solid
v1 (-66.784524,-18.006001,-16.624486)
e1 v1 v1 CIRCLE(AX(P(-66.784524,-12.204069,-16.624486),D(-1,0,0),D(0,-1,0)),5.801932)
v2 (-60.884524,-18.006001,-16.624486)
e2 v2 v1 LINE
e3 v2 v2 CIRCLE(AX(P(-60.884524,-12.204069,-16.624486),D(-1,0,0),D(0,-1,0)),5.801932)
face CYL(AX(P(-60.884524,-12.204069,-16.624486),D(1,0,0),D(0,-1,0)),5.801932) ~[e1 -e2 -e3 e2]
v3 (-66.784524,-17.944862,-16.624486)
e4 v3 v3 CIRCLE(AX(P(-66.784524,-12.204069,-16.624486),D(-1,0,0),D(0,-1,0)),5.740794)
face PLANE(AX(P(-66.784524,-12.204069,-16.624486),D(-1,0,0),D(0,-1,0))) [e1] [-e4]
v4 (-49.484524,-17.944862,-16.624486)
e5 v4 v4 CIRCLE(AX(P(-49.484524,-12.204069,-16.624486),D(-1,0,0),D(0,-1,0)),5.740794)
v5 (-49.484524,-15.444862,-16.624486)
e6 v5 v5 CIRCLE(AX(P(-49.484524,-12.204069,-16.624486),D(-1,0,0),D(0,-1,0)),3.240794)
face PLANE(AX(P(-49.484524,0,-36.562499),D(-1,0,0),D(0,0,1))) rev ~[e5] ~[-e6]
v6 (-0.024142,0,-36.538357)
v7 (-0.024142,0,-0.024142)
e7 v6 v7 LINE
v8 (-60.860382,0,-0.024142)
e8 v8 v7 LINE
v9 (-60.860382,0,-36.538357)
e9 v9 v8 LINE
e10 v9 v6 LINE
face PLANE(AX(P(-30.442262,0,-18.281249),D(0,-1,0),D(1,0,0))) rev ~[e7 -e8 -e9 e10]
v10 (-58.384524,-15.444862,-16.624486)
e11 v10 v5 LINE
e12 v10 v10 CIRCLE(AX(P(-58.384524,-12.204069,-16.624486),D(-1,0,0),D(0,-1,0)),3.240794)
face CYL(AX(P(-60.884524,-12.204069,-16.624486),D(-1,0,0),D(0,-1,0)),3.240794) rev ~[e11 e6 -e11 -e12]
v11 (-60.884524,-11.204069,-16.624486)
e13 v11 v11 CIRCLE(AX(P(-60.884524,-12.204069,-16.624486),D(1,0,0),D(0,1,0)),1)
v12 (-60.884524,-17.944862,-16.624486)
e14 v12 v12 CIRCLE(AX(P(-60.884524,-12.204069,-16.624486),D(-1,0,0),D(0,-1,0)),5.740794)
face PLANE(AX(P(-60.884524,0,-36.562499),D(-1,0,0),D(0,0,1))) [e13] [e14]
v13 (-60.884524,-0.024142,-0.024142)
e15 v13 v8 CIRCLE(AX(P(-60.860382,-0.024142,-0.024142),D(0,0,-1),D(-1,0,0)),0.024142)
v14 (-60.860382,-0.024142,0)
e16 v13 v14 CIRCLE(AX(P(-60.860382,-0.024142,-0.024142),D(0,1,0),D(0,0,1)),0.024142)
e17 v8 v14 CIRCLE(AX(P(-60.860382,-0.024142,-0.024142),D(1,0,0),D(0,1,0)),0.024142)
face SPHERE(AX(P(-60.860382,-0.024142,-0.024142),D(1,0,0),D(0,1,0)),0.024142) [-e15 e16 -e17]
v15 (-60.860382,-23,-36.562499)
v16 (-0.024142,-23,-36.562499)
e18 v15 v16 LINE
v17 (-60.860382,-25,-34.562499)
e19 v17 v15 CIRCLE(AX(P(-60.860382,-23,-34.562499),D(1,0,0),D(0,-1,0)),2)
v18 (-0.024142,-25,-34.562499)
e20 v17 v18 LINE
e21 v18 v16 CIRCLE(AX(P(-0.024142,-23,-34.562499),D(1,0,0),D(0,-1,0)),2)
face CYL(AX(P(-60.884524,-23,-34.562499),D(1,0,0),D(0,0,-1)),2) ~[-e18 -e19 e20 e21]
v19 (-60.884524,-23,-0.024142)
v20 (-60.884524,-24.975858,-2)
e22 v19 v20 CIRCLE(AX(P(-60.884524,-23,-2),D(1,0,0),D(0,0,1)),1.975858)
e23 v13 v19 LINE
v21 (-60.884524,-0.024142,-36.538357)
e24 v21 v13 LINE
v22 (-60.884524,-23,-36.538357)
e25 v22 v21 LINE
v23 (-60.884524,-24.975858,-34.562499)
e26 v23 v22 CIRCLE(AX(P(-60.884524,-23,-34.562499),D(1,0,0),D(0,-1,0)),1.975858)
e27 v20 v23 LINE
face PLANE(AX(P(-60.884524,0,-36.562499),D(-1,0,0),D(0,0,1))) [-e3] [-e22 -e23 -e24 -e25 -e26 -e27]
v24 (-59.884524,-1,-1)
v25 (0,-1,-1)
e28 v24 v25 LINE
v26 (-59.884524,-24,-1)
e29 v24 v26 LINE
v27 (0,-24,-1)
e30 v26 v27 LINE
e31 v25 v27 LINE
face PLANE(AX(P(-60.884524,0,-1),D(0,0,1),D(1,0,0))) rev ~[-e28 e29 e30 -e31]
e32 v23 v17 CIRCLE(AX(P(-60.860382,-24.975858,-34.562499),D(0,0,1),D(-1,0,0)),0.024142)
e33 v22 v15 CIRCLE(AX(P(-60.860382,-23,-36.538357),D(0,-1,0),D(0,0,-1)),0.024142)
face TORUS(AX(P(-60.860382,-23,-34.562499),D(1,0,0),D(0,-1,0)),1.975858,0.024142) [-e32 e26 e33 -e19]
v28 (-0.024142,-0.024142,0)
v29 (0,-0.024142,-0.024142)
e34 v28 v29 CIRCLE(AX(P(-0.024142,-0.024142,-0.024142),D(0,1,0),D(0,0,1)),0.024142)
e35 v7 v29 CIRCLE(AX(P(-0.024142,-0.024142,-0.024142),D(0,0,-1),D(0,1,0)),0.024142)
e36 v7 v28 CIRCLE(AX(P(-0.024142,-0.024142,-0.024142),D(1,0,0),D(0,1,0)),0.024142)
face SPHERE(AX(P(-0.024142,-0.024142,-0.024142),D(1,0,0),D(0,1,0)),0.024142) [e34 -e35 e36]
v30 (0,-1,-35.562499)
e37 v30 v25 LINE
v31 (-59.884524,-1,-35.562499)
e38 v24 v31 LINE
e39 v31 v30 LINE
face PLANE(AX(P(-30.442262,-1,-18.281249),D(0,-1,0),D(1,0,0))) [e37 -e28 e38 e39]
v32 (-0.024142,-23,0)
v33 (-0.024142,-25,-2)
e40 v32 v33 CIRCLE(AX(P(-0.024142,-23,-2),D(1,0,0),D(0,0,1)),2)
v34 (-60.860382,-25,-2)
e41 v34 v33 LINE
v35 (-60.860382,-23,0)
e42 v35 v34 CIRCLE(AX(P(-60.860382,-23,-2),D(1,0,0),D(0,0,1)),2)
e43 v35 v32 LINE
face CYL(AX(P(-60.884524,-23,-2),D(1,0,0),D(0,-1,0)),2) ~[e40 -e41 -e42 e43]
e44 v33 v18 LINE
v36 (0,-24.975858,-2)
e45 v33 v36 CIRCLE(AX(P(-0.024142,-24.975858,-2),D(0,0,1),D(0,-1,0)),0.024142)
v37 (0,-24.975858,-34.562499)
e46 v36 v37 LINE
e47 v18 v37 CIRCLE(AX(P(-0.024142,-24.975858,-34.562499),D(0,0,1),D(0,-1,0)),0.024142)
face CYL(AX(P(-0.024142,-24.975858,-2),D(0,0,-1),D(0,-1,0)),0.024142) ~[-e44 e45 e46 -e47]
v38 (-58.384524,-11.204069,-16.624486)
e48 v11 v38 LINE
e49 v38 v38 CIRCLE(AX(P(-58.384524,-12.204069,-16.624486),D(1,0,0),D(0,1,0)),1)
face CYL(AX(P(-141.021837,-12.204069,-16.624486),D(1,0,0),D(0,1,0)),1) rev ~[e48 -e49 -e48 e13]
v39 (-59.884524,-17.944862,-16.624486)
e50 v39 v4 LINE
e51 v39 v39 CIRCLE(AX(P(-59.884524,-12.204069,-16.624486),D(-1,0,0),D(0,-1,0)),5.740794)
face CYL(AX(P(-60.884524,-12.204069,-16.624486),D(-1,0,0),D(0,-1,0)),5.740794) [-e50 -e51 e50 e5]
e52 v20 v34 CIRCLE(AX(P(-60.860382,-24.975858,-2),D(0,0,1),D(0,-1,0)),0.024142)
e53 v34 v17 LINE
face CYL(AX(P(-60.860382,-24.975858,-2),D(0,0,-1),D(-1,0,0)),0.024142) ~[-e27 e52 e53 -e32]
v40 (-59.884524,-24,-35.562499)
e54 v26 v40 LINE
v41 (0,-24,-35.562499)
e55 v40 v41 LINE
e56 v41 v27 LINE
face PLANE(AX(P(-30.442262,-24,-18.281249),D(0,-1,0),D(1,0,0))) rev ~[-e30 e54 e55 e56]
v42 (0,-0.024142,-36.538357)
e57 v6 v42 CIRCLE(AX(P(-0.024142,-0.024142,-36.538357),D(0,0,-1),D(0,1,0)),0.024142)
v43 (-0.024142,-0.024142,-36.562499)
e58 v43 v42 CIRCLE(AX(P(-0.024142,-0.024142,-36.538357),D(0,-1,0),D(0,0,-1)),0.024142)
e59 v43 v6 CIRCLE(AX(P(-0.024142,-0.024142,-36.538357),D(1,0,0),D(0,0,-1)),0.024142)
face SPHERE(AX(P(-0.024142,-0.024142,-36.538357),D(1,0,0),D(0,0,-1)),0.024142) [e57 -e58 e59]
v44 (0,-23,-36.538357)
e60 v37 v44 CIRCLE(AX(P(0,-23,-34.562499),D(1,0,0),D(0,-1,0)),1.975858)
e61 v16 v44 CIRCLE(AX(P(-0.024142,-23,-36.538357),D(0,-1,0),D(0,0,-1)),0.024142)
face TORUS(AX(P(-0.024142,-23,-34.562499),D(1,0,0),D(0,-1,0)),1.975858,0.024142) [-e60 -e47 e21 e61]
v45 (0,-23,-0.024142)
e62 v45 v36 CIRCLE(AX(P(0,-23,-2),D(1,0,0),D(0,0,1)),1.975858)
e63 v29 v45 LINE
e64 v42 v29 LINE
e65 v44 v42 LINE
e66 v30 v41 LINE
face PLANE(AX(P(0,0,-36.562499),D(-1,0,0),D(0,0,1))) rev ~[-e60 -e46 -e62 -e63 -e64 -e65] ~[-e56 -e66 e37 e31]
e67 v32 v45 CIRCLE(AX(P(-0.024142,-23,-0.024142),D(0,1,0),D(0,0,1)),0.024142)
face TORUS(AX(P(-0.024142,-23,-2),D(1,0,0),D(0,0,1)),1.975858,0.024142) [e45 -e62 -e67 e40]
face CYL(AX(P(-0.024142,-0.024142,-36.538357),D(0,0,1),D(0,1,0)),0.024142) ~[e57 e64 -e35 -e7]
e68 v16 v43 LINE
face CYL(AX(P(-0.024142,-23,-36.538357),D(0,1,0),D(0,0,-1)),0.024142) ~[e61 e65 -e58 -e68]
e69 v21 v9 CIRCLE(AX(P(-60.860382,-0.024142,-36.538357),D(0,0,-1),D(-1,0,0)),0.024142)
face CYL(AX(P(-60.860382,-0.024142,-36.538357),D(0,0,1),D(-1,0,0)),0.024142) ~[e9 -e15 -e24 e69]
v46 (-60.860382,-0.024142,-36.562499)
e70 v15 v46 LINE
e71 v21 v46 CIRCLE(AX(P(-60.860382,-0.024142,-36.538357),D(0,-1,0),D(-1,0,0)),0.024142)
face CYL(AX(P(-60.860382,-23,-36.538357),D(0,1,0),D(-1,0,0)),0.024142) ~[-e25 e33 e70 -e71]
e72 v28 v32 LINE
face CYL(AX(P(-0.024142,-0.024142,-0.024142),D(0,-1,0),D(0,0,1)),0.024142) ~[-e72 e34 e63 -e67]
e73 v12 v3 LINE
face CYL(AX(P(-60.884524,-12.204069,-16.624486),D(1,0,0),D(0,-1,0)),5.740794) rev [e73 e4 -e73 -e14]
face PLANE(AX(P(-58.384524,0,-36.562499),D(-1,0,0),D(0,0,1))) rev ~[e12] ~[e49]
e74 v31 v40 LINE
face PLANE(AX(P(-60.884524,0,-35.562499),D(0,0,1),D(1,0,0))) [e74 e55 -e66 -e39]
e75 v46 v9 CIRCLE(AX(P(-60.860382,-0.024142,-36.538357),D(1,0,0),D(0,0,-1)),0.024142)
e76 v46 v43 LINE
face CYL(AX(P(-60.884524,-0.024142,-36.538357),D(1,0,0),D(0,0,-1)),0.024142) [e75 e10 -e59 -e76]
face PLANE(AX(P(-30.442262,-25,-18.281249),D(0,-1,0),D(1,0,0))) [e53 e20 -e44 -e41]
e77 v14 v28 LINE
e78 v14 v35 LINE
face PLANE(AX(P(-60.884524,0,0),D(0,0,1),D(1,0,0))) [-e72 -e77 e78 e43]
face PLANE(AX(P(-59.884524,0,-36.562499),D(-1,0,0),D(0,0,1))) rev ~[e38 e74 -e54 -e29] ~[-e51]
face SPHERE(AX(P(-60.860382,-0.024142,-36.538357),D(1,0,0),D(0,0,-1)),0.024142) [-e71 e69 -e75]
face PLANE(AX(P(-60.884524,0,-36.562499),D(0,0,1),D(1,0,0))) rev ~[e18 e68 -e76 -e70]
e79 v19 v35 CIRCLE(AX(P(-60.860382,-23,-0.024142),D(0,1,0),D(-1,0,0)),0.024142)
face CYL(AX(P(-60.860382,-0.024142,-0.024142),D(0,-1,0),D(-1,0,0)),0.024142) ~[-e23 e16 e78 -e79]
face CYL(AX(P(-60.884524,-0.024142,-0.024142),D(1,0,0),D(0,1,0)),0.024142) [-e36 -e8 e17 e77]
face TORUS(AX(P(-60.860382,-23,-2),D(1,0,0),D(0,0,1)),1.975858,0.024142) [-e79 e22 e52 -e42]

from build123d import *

# Parameters (mm, degrees)
F0_W     = 60.8845241368
F0_H     = 36.5624986589
F1_DEPTH = 25
F2_T     = -1
F3_R     = 5.8019318328
F3_R_2   = 5.7407936272
F4_DEPTH = 5.9
F5_DEPTH = 11.4
F6_T     = -2.5
F9_D     = 2
F10_R    = 2
F11_R    = 0.0241421356
F12_R    = 0.0241421356


# Not quite as in the source:
# - a feature of the source that left no trace in its solid (it failed there, or was rolled back) is left out


with BuildPart() as f1:
    # F0 (on Front) → F1 (new body)
    with BuildSketch(Plane.XZ):
        with Locations((-30.4422620684, -18.2812493294)):
            Rectangle(F0_W, F0_H)
    extrude(amount=F1_DEPTH)

    # F2
    f2_openings = [f1.faces().sort_by_distance(p)[0] for p in [
        (0, -12.5, -18.281249),
    ]]
    offset(amount=F2_T, openings=f2_openings)

    # F3 (on face) → F4 (join)
    with BuildSketch(Plane(origin=(-60.8845241368, 0, 0), x_dir=(0, -1, 0), z_dir=(-1, 0, 0))):
        with Locations((12.2040687129, -16.6244860739)):
            Circle(F3_R)
        with Locations((12.2040687129, -16.6244860739)):
            Circle(F3_R_2, mode=Mode.SUBTRACT)
    extrude(amount=F4_DEPTH)

    # F5 (add): a face of the model
    f5_faces = [f1.faces().sort_by_distance(p)[0] for p in [
        (-60.8845241368, -12.2040687129, -16.6244860739),
    ]]
    extrude(f5_faces, amount=-F5_DEPTH)

    # F6
    f6_openings = [f1.faces().sort_by_distance(p)[0] for p in [
        (-49.484524, -12.204069, -16.624486),
    ]]
    offset(amount=F6_T, openings=f6_openings)

    # F9 (through all)
    with Locations(Plane(origin=(-60.8845241368, 0, 0), x_dir=(0, -1, 0), z_dir=(-1, 0, 0))):
        with Locations((12.2040687129, -16.6244860739)):
            Hole(F9_D / 2)

    # F10
    f10_edges = [f1.edges().sort_by_distance(p)[0] for p in [
        (-30.442262, -25, -36.562499),
        (-30.442262, -25, 0),
    ]]
    fillet(f10_edges, radius=F10_R)

    # F11
    f11_edges = [f1.edges().sort_by_distance(p)[0] for p in [
        (-30.442262, 0, -36.562499),
        (-30.442262, 0, 0),
    ]]
    fillet(f11_edges, radius=F11_R)

    # F12
    f12_edges = [f1.edges().sort_by_distance(p)[0] for p in [
        (-30.442262, -0.024142, -36.562499),
        (-30.442262, 0, -0.024142),
        (0, 0, -18.281249),
        (-60.884524, 0, -18.281249),
        (0, -11.512071, 0),
        (-60.884524, -11.512071, 0),
        (0, -11.512071, -36.562499),
        (0, -0.007071, -36.555428),
        (0, -24.414214, -35.976712),
        (0, -25, -18.281249),
        (0, -0.007071, -0.007071),
        (0, -24.414214, -0.585786),
        (-60.884524, -0.007071, -0.007071),
        (-60.884524, -24.414214, -0.585786),
        (-60.884524, -25, -18.281249),
        (-60.884524, -0.007071, -36.555428),
        (-60.884524, -24.414214, -35.976712),
        (-60.884524, -11.512071, -36.562499),
    ]]
    fillet(f12_edges, radius=F12_R)


solid = f1.part
